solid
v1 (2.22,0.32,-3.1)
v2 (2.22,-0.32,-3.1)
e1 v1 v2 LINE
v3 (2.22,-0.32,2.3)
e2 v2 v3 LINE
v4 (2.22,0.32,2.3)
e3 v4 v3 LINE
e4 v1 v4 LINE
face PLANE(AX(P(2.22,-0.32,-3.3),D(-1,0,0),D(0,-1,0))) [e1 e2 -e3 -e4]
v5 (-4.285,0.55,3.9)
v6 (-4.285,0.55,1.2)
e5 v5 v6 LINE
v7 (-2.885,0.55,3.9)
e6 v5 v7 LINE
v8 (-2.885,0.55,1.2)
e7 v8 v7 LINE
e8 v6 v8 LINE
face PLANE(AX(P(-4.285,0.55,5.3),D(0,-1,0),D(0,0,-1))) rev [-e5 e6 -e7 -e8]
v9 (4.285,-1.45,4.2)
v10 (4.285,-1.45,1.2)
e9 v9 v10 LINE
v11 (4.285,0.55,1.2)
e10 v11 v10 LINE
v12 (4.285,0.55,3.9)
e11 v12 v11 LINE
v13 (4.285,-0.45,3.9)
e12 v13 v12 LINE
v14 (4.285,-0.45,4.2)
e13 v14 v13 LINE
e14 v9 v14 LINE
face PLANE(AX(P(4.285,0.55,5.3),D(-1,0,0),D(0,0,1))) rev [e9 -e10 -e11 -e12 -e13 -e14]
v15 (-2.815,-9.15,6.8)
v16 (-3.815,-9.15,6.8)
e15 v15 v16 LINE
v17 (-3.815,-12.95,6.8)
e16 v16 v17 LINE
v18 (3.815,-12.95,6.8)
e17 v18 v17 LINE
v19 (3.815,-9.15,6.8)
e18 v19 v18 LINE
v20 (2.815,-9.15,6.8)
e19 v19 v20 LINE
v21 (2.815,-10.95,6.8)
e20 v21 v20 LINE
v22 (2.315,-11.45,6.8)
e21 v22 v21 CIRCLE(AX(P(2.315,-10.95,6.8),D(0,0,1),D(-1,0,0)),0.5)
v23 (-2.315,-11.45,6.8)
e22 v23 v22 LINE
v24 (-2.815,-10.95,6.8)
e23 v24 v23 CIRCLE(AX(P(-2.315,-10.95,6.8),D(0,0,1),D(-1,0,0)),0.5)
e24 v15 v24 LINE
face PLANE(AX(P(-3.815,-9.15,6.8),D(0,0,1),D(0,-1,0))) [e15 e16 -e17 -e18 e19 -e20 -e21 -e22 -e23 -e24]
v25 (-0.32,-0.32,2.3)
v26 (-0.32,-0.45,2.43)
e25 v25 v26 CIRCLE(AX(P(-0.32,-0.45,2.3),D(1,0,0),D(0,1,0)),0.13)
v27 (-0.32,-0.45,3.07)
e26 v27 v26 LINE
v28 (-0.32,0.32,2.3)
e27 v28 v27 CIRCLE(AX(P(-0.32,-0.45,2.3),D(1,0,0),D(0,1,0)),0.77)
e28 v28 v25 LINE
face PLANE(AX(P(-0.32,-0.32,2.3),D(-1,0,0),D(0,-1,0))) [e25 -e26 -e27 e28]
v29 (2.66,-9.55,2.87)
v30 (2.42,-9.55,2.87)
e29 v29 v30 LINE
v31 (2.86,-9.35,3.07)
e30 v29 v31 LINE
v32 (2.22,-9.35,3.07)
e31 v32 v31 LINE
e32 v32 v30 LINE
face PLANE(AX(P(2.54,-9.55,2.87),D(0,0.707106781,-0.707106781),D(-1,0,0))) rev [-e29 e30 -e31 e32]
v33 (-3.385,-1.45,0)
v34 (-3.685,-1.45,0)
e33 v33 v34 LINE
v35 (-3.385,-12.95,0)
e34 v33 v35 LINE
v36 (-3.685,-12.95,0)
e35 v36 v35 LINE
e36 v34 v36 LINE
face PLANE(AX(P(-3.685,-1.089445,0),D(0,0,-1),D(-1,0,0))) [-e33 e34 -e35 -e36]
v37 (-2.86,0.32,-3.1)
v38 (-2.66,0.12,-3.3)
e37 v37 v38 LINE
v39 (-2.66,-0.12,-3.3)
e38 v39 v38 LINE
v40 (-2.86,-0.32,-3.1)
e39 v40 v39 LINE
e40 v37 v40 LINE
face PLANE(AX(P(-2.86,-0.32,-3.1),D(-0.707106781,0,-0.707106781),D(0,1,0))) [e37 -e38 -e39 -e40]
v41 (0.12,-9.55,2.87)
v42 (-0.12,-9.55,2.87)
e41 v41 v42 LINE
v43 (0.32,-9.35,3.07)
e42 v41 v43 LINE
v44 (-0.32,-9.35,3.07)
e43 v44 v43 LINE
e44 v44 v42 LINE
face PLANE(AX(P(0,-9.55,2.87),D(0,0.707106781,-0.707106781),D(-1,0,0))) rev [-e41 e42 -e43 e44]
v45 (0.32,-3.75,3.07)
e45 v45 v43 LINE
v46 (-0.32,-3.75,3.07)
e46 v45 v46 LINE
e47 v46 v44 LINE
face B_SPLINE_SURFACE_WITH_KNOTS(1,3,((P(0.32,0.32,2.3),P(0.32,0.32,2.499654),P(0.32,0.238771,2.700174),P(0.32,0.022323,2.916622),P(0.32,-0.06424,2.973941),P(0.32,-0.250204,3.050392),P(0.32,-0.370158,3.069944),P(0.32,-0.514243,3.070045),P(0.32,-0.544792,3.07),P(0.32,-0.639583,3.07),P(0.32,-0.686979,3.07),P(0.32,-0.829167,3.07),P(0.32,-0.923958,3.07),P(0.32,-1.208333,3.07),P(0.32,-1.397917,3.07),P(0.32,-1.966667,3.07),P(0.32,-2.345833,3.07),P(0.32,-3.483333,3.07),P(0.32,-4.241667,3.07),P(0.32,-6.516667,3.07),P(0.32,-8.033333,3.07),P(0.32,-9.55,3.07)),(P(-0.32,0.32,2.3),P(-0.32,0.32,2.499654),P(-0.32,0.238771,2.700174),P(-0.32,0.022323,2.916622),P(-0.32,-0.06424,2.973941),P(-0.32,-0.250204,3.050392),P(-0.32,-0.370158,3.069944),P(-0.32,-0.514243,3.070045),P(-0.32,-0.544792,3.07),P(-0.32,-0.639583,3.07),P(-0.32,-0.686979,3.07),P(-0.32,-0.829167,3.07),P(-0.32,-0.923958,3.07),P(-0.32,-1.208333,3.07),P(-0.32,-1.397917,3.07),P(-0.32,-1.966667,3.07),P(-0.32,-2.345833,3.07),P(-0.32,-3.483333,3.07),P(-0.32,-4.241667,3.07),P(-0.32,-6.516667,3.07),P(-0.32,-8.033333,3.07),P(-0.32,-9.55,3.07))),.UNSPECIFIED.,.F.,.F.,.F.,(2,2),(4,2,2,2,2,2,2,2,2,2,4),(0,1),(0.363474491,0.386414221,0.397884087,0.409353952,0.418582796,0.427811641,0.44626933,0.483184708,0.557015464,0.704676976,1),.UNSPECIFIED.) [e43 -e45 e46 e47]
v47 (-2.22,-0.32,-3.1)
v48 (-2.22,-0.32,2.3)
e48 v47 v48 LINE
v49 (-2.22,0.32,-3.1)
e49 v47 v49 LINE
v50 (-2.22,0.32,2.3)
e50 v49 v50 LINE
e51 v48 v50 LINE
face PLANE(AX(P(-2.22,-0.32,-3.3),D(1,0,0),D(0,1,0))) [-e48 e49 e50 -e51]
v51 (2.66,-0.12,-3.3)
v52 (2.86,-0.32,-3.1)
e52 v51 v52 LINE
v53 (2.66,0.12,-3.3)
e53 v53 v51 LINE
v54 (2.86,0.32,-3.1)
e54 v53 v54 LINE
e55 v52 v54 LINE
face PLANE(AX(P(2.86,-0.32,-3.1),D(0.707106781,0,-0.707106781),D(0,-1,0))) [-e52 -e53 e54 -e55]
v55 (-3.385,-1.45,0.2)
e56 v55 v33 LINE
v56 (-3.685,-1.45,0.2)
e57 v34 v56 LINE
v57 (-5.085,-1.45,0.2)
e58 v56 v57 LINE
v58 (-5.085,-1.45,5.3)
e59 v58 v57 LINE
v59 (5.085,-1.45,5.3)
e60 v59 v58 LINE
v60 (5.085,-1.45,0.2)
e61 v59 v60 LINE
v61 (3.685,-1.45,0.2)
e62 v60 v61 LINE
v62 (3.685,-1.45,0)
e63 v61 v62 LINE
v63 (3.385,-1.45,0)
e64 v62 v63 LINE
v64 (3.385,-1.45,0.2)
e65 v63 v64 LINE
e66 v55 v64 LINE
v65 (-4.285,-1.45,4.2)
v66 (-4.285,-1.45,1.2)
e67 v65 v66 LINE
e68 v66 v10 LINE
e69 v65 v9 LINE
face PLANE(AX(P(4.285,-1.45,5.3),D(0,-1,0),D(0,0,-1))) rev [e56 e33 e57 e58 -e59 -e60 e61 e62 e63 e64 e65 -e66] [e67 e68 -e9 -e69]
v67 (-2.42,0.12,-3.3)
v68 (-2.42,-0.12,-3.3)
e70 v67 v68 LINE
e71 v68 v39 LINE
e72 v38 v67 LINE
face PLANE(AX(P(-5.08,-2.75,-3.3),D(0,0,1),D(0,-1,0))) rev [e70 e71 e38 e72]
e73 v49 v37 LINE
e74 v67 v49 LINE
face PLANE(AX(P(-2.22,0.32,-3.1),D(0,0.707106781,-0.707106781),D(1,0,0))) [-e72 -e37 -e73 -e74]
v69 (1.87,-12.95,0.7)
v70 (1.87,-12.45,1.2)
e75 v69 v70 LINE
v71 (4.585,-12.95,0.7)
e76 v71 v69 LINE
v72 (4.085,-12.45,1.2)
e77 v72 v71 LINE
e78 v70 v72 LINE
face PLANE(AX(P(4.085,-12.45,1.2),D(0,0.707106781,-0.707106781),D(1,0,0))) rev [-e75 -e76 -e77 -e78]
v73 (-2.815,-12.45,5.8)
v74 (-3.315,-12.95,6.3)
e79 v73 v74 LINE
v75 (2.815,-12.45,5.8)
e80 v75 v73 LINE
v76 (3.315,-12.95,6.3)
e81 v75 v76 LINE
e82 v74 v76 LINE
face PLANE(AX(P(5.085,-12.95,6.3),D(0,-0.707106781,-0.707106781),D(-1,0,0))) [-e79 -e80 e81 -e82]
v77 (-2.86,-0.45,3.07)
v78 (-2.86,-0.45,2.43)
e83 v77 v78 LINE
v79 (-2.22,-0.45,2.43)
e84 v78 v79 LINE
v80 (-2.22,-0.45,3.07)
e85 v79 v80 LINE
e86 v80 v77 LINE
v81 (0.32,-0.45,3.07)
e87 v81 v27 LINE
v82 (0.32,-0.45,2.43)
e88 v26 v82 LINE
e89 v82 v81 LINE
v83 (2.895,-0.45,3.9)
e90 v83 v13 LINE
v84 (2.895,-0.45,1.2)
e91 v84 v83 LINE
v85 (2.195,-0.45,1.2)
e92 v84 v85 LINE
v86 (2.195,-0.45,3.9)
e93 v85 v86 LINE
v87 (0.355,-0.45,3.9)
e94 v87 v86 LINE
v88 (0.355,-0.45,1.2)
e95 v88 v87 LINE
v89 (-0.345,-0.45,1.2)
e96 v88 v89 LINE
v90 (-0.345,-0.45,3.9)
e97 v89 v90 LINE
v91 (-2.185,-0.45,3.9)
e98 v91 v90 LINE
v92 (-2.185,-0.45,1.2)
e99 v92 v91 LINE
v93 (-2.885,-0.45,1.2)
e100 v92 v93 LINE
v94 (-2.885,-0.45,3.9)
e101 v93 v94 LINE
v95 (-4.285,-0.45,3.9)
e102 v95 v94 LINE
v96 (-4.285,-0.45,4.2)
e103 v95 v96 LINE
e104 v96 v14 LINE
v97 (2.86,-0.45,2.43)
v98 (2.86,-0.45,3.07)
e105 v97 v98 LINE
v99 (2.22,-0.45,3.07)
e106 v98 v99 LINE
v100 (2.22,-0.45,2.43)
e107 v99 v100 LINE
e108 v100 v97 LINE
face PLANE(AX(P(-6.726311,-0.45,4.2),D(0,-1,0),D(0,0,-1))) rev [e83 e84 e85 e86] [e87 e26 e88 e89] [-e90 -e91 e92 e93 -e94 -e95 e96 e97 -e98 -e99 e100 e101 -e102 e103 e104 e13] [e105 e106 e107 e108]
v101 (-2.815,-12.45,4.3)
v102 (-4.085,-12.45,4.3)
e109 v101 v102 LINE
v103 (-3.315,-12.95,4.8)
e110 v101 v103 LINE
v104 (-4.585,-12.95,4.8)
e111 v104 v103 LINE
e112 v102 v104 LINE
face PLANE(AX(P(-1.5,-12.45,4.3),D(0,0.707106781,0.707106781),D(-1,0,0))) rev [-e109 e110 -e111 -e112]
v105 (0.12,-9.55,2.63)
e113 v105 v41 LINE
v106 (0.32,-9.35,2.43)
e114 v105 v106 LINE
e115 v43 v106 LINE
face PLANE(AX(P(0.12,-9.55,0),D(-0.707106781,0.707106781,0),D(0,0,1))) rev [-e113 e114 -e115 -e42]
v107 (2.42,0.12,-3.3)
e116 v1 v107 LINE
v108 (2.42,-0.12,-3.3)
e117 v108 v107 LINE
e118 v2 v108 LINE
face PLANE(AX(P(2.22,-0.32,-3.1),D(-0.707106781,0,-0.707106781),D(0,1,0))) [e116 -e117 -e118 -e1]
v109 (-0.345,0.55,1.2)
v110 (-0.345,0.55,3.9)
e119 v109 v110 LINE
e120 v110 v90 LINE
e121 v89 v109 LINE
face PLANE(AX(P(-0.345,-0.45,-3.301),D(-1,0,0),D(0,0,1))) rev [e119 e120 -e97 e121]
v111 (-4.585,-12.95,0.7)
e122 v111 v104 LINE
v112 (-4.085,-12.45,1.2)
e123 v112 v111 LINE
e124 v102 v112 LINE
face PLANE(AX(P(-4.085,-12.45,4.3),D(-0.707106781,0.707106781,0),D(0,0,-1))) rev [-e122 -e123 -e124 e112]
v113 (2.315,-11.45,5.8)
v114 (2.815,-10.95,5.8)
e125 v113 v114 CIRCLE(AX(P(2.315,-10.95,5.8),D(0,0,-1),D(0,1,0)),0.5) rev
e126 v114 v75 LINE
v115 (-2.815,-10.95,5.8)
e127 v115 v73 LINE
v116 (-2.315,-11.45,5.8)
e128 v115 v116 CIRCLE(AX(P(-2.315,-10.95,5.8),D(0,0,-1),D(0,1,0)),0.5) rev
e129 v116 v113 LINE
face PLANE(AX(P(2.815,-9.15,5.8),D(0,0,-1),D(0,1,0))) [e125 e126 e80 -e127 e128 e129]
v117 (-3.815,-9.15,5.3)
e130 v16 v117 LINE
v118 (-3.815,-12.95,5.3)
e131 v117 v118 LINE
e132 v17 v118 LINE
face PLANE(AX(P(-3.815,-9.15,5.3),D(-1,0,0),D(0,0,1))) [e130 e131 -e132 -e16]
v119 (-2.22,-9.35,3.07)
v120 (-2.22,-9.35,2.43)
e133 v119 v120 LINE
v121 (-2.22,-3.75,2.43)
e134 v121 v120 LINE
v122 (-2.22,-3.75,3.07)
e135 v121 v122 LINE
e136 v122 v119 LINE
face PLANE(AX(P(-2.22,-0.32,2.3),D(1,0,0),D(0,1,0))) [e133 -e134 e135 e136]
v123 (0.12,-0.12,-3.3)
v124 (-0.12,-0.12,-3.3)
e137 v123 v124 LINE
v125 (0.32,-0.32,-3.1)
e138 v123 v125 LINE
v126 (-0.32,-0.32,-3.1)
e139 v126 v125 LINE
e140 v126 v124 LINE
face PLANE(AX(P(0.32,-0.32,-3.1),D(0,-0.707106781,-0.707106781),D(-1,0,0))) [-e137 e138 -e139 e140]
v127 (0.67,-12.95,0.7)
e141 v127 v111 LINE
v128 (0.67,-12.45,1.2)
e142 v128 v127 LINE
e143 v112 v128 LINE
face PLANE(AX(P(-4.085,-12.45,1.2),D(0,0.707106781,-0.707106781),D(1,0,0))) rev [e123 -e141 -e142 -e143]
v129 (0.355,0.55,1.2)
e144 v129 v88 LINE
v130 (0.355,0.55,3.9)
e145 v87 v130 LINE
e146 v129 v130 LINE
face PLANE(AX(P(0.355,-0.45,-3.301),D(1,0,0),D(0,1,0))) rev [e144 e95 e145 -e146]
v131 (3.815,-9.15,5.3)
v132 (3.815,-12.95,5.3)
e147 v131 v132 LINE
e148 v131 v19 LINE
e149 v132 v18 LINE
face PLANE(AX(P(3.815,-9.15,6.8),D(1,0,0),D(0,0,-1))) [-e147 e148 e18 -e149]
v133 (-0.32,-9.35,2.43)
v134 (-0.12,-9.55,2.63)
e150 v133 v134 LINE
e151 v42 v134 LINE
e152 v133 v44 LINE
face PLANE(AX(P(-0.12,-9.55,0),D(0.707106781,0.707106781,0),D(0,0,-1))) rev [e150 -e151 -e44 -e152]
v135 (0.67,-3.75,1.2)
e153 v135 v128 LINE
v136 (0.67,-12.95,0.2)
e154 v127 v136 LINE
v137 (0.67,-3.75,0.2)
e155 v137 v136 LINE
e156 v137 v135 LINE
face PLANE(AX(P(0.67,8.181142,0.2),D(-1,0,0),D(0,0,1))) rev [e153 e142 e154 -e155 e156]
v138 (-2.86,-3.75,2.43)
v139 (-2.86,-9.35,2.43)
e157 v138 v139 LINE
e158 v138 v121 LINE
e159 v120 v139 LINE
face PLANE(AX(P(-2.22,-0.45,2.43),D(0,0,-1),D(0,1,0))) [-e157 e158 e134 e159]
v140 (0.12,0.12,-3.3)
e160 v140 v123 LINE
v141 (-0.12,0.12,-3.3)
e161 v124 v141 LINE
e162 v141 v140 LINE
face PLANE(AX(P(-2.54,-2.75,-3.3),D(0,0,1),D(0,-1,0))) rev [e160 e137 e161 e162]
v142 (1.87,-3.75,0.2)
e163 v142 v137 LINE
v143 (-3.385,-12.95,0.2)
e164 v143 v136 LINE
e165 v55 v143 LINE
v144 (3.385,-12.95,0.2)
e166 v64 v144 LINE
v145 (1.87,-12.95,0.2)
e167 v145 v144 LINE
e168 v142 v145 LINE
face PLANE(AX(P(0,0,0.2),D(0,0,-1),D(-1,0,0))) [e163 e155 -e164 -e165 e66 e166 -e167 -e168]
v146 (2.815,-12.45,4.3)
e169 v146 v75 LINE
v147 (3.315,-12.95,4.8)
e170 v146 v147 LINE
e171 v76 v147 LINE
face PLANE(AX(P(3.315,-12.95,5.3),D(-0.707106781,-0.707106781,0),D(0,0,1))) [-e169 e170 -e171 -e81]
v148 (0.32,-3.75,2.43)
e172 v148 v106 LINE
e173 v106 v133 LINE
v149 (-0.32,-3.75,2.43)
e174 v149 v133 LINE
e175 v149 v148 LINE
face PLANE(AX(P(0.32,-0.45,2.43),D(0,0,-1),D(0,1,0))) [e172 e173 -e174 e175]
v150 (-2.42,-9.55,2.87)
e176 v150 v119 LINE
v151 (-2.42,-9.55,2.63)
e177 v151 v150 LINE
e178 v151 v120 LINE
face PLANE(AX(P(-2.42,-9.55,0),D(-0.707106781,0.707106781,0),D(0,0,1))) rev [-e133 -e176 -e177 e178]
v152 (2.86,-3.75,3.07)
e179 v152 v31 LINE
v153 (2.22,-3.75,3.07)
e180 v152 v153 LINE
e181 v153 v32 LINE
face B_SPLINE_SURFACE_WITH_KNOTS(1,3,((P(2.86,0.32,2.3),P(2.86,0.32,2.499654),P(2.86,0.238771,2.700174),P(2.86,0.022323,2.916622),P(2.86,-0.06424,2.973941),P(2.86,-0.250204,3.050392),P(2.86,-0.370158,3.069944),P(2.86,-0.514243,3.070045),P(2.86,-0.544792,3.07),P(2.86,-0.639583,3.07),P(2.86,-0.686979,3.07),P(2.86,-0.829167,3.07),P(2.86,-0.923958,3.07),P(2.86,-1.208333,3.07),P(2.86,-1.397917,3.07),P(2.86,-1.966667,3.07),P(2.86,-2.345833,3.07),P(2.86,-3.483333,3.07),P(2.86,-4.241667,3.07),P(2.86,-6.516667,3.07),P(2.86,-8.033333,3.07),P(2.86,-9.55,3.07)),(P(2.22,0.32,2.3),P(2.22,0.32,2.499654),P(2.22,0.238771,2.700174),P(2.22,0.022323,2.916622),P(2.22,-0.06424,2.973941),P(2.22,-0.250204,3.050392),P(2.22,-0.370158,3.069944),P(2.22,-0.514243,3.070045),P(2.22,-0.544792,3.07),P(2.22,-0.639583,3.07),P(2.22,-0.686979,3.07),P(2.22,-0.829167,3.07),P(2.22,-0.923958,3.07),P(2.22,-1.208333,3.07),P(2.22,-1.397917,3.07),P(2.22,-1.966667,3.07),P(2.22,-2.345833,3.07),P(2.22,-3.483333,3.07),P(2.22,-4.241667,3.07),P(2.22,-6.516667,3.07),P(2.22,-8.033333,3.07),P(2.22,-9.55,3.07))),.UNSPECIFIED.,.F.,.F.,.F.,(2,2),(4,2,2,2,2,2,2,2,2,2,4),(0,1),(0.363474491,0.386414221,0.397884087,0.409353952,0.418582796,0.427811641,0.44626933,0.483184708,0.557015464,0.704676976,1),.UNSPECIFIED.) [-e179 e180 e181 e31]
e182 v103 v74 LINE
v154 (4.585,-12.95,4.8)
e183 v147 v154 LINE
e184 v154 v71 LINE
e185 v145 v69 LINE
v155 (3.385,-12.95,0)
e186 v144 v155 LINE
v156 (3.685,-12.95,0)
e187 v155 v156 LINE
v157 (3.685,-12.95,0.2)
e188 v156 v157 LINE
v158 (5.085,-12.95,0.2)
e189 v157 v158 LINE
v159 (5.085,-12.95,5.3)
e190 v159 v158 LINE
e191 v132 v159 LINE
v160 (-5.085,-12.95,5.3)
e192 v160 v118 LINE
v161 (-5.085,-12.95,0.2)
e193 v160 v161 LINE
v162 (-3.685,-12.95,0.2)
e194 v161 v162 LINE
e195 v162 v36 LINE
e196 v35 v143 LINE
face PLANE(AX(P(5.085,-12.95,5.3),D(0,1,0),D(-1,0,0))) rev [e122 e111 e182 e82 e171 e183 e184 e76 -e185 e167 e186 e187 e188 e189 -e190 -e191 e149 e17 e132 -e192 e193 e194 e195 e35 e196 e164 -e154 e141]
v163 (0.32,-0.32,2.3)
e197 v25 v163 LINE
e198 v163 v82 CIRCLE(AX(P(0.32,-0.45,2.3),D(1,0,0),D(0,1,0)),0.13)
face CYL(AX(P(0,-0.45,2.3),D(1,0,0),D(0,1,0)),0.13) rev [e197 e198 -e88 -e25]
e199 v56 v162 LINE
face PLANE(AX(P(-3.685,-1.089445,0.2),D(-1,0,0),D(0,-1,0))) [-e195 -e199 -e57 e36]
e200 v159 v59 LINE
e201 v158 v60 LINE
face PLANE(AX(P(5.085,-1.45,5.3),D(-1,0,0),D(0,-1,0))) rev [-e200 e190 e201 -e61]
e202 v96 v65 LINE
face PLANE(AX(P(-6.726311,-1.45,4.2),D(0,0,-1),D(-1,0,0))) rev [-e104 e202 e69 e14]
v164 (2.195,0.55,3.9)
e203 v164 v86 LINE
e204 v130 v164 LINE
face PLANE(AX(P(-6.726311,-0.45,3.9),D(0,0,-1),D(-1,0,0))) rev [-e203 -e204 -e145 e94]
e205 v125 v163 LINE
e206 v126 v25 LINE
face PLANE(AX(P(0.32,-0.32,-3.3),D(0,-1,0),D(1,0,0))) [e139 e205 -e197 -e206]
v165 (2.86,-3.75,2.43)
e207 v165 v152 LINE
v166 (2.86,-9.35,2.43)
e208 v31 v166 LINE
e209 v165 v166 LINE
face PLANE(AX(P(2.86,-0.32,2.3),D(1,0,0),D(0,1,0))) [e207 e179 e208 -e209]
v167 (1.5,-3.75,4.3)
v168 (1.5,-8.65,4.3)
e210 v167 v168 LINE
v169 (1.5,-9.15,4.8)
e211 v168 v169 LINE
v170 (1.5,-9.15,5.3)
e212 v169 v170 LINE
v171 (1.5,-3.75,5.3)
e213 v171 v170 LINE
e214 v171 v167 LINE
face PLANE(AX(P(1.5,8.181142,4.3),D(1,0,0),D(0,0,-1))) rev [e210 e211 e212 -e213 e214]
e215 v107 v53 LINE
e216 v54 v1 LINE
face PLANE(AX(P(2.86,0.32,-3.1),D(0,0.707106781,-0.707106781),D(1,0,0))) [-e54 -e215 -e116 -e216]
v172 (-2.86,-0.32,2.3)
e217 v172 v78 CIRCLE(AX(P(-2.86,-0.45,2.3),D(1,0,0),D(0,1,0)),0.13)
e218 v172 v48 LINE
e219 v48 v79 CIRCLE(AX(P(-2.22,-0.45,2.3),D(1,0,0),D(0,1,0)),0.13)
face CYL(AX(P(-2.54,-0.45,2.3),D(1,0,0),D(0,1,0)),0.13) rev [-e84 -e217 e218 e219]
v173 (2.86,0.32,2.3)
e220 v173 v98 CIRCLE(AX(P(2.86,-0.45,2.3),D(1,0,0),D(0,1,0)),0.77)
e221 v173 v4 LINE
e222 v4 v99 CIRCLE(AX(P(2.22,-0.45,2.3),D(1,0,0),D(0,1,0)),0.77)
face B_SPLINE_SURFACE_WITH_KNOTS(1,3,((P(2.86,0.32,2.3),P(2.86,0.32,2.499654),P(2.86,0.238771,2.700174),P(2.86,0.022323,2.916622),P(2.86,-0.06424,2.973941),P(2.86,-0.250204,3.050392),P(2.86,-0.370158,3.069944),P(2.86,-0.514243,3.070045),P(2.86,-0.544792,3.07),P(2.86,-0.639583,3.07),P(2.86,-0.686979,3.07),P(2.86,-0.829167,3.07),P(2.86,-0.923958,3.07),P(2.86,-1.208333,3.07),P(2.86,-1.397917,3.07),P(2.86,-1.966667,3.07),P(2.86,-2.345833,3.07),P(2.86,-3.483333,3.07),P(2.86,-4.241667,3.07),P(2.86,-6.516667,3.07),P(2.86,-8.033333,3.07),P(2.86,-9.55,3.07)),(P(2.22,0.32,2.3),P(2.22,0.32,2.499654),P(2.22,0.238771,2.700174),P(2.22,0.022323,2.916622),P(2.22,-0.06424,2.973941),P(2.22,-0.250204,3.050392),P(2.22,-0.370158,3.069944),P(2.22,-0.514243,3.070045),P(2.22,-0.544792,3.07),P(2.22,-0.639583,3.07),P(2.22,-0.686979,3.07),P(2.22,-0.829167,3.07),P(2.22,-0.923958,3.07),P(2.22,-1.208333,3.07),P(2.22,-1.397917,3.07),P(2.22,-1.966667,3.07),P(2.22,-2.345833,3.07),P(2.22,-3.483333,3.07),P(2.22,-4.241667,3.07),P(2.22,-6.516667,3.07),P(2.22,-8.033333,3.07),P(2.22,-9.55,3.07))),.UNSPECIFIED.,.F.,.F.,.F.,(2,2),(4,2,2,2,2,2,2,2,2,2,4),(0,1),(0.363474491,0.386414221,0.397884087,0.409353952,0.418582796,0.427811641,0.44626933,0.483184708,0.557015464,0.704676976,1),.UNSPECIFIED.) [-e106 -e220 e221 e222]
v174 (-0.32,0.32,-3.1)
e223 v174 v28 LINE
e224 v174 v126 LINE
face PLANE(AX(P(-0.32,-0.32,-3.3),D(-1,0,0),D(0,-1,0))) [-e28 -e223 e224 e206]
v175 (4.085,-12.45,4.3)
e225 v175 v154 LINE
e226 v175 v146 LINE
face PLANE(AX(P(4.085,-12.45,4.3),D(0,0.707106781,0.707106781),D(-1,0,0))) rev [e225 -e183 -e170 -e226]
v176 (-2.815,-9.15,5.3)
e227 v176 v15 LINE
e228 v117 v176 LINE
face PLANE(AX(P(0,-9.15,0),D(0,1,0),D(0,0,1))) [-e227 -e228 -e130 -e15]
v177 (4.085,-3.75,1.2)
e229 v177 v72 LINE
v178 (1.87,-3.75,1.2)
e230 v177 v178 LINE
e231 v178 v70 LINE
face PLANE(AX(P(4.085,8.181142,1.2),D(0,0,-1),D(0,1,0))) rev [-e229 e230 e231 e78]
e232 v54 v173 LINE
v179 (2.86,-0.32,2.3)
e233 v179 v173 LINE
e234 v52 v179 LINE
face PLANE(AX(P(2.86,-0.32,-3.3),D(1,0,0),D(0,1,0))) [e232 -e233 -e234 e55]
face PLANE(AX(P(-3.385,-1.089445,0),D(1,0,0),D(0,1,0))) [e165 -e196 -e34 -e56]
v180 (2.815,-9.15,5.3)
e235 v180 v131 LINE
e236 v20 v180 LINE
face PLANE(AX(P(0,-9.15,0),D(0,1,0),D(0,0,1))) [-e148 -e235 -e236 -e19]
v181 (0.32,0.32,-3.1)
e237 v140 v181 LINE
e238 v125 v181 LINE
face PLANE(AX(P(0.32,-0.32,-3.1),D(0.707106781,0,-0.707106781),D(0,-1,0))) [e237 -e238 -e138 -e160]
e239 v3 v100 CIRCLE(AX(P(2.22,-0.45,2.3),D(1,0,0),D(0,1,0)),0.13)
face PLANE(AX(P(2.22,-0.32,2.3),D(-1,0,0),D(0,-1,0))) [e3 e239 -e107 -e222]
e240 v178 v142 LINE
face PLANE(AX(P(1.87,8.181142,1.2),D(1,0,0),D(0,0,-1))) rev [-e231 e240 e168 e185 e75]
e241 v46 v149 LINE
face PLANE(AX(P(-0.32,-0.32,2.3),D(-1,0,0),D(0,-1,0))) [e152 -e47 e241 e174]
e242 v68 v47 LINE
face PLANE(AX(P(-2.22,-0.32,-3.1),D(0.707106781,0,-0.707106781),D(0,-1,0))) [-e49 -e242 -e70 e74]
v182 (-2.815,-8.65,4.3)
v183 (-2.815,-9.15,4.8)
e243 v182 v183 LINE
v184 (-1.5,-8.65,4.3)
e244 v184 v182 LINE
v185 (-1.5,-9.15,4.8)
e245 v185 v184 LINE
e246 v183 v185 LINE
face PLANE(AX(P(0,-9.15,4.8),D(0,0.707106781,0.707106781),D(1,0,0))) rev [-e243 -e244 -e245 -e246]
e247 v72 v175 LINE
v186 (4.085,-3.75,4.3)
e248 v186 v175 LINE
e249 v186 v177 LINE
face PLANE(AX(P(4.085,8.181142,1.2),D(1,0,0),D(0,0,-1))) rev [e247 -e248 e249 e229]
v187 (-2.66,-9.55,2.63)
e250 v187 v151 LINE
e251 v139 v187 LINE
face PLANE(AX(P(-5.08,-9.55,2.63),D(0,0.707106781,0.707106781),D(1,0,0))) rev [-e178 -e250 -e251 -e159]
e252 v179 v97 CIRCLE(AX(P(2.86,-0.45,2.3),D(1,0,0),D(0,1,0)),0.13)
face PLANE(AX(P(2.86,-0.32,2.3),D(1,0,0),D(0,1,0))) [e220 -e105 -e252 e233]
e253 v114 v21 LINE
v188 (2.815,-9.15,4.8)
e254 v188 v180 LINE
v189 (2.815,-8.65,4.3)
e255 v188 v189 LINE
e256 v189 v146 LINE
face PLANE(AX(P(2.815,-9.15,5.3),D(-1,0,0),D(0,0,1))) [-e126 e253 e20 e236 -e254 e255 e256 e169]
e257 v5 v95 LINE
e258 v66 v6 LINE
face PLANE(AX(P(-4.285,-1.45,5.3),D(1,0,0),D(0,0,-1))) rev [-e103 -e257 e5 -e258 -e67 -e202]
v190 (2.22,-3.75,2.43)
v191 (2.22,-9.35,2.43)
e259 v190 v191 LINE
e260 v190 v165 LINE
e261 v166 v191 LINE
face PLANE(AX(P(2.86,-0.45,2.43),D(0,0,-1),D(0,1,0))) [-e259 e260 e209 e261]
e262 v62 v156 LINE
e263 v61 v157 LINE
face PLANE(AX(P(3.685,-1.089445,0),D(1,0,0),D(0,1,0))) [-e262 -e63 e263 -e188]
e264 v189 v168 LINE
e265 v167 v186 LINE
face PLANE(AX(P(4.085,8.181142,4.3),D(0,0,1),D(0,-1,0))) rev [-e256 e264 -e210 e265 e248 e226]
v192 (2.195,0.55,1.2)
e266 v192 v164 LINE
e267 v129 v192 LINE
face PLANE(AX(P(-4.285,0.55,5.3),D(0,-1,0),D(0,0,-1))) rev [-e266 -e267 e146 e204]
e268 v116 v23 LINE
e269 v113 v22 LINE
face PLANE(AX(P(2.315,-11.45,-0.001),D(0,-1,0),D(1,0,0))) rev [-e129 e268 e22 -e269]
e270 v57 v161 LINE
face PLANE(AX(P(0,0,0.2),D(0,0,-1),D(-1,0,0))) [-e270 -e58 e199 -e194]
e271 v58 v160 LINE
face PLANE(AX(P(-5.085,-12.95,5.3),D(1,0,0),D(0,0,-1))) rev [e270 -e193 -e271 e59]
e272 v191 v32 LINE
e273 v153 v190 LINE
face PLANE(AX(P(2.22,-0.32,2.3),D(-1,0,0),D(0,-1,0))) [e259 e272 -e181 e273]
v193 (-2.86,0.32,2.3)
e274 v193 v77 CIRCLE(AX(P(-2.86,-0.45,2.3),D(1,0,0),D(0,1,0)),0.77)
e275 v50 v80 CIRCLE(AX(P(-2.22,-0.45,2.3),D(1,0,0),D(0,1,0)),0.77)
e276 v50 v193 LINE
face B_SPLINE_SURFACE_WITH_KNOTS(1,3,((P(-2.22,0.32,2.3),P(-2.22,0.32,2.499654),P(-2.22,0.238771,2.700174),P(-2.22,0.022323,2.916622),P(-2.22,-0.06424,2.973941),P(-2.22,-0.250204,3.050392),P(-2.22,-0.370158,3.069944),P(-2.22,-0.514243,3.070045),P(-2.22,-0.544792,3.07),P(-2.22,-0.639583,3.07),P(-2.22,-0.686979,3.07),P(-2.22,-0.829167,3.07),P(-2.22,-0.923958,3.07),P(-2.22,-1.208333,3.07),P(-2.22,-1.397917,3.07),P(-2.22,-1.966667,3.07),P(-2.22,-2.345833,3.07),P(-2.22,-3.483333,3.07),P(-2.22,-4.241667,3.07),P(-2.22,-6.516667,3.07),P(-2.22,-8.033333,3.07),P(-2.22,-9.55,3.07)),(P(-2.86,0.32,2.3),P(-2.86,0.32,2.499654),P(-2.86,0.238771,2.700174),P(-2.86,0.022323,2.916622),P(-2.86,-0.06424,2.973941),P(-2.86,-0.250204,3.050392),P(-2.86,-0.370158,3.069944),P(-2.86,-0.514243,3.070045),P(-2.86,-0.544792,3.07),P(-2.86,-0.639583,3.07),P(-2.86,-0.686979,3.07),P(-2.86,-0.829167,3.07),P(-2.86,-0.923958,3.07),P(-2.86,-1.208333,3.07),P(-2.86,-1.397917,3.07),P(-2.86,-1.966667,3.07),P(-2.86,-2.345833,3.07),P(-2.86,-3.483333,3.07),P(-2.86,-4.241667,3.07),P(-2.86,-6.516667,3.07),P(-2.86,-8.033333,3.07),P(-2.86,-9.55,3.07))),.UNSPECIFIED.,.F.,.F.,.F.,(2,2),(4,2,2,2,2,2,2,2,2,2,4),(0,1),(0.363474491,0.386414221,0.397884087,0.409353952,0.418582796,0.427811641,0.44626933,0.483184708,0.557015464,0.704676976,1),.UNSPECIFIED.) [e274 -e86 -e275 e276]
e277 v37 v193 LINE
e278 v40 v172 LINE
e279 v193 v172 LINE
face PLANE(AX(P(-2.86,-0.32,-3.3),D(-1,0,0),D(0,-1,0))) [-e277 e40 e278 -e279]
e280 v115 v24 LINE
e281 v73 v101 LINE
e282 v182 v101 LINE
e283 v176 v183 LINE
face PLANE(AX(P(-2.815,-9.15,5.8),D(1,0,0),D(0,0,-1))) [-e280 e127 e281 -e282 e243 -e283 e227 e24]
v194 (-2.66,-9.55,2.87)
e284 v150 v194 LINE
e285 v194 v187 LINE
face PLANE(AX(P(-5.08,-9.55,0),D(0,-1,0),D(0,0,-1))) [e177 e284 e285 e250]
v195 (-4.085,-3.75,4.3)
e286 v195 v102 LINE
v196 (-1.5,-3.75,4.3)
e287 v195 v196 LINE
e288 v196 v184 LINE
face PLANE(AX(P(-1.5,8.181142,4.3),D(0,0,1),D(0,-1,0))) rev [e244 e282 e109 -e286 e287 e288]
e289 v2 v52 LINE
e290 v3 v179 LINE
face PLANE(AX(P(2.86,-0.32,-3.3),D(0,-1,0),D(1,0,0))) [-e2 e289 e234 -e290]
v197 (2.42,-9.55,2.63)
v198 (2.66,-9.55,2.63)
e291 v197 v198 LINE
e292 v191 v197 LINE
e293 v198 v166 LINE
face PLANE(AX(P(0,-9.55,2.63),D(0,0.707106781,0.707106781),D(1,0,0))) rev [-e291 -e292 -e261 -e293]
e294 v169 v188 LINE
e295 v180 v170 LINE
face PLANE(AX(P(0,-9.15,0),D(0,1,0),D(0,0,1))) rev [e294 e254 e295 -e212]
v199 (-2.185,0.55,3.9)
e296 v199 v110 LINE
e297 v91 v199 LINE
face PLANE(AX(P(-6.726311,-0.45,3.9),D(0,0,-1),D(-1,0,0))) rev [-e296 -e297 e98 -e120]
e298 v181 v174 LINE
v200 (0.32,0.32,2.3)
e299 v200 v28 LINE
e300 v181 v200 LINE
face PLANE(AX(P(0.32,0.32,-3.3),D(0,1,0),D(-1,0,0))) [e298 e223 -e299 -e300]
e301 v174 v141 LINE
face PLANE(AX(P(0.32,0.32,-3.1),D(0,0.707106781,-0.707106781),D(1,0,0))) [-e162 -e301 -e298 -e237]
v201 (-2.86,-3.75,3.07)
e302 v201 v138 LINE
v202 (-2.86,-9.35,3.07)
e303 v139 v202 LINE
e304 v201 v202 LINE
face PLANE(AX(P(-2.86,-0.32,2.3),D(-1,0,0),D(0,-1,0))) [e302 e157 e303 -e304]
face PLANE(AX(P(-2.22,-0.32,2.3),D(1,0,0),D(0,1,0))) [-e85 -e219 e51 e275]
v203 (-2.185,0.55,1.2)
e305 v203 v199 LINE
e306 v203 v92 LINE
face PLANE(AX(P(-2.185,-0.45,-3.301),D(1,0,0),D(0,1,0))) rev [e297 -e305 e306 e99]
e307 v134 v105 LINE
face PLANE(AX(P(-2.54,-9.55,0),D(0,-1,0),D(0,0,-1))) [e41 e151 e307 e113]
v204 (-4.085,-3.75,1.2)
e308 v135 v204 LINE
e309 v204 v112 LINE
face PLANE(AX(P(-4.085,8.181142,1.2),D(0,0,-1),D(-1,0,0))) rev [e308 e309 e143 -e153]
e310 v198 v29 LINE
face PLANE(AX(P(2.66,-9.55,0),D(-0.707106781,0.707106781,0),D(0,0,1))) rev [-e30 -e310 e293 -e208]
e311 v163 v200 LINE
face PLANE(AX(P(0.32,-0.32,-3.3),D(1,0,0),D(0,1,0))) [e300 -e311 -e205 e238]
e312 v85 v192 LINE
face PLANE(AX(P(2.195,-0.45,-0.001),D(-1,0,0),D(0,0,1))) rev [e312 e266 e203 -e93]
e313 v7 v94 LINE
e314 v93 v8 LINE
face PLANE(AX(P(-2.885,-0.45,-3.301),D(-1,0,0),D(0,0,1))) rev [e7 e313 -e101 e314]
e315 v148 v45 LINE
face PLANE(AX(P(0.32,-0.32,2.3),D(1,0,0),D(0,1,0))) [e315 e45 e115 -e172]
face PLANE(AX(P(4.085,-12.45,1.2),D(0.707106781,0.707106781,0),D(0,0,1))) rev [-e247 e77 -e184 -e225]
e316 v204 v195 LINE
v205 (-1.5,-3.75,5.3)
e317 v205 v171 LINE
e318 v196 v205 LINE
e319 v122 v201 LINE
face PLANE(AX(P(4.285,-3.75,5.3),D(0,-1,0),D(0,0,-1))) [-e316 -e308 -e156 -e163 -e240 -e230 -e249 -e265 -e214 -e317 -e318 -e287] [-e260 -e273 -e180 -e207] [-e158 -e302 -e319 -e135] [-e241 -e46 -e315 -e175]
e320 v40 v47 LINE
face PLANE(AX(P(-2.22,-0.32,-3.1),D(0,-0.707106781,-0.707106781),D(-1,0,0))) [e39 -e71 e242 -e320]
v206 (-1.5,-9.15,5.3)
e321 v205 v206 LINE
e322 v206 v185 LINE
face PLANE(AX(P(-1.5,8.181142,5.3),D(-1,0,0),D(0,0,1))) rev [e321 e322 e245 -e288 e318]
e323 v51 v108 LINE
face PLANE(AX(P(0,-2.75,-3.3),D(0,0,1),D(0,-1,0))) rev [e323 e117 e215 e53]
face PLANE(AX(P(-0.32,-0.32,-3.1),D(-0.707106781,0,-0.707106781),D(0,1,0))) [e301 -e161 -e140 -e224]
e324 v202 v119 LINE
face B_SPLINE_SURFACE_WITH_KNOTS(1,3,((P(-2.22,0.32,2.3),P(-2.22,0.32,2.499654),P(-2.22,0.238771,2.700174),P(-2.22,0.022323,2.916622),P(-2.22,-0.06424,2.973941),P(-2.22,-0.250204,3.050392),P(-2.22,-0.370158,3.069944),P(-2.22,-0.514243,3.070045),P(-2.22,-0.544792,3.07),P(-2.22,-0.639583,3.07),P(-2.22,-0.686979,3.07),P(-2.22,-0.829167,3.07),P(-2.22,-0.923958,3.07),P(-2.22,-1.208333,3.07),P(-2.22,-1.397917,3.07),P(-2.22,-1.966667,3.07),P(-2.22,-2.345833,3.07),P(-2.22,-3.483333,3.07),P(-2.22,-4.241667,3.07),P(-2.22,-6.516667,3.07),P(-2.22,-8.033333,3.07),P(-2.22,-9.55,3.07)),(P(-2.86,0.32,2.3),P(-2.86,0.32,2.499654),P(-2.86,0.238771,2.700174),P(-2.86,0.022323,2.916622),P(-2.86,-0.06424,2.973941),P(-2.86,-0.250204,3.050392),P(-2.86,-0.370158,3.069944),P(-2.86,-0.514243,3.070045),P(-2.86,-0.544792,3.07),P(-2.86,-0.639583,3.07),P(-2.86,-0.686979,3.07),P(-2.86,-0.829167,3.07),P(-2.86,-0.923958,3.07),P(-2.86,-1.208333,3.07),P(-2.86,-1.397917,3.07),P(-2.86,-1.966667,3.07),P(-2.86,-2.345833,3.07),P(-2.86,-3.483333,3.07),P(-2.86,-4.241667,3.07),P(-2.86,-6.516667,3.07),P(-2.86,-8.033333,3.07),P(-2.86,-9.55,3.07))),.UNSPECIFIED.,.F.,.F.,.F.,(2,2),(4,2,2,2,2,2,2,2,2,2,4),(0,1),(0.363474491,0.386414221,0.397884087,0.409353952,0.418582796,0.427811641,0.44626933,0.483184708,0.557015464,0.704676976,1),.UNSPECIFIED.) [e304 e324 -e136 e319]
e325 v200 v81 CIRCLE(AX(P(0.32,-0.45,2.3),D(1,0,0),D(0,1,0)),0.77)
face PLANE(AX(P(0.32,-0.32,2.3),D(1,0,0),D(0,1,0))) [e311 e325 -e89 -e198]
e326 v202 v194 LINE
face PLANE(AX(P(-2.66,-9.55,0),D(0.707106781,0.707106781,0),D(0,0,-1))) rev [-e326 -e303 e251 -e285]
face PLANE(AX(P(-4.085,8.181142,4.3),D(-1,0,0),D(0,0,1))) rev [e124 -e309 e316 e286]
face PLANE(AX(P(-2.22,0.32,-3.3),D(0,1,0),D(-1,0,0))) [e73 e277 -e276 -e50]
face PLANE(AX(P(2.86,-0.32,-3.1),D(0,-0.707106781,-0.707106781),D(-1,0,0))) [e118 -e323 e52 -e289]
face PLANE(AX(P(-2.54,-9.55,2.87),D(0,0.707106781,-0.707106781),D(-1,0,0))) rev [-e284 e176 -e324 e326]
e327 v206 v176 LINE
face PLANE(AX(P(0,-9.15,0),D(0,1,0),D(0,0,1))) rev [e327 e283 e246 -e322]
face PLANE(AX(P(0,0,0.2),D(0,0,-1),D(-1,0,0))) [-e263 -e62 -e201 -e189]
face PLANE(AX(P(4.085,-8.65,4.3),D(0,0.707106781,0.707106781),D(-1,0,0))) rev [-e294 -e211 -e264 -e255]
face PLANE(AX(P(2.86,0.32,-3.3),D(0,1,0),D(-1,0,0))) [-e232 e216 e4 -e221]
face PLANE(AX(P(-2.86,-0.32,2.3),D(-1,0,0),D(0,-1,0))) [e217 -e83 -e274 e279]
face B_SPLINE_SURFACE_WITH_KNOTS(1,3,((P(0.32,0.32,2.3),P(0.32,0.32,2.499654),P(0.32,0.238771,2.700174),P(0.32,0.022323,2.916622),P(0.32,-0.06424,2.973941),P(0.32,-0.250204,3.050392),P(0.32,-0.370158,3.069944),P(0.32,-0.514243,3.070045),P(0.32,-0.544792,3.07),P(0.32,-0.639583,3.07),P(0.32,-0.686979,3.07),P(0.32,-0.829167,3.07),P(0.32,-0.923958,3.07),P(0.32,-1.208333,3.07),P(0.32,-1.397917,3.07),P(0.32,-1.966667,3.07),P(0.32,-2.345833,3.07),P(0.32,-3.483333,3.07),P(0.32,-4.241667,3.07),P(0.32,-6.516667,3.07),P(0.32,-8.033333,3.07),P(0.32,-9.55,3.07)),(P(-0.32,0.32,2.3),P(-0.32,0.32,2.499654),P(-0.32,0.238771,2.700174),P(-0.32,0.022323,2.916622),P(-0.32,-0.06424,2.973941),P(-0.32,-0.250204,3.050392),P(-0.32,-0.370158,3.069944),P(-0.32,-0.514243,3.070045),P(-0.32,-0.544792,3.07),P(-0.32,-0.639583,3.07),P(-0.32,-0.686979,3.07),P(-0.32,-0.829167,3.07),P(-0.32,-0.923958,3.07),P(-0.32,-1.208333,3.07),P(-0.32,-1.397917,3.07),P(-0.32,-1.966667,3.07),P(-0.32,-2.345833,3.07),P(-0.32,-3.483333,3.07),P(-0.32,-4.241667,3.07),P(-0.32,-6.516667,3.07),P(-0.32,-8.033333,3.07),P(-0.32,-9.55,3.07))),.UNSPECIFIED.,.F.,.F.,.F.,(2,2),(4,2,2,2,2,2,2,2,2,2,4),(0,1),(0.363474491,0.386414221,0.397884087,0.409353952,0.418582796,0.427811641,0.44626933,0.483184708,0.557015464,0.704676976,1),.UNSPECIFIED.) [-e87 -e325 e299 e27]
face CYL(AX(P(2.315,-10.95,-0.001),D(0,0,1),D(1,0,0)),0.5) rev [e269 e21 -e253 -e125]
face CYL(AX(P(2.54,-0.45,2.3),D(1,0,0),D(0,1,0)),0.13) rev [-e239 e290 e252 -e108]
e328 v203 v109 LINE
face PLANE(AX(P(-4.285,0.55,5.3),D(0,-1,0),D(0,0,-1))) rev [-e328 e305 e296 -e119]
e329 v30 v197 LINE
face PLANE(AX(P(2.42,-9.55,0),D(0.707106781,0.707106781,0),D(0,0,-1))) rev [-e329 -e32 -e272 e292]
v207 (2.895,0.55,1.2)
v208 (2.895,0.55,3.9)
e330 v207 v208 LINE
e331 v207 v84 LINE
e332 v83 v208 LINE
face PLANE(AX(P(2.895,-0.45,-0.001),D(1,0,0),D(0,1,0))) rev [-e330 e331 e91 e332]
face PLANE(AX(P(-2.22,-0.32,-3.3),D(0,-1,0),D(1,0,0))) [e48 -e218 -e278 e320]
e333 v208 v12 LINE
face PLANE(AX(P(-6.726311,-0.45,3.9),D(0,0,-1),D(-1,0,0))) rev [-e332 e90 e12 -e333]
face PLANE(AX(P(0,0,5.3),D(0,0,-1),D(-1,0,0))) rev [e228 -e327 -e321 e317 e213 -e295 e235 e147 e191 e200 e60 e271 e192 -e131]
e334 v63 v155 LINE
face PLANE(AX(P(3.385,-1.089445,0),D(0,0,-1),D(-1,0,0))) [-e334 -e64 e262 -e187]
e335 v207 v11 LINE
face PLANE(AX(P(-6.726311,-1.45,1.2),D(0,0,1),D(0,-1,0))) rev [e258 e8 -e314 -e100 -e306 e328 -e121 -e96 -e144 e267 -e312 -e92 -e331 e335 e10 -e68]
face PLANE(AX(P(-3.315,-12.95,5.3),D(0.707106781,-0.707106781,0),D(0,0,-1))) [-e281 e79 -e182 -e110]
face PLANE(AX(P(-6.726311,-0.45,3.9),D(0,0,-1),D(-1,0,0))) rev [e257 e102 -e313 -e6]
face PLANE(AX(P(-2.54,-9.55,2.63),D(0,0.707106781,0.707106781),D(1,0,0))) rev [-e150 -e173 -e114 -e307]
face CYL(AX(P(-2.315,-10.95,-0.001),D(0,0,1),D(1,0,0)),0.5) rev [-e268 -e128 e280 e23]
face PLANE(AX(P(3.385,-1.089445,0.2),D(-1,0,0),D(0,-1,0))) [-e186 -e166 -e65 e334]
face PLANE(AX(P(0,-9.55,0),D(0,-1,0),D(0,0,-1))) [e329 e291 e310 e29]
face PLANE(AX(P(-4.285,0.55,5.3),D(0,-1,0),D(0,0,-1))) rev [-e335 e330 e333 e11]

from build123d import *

# Parameters (mm, degrees)
EXTRUDE_START                      = 0.2
EXTRUDE_1_DEPTH                    = 5.1
SKETCH_7_W                         = 0.3
SKETCH_7_H                         = 0.2
EXTRUDE_4_DEPTH                    = 11.5
SKETCH_8_W                         = 1
SKETCH_8_H                         = 2
CUT_EXTRUDE_5_DEPTH                = 8.57
CUT_EXTRUDE_1_DEPTH                = 9.2
EXTRUDE_2_DEPTH                    = 3.8
SKETCH_4_W                         = 5.63
SKETCH_4_H                         = 1
CUT_EXTRUDE_2_DEPTH                = 3.8
CUT_EXTRUDE_3_REACH                = 17.485
CHAMFER_1_SIZE                     = 0.5
CUT_EXTRUDE_6_REACH                = 16.449
SKETCH_9_W                         = 0.7
SKETCH_9_H                         = 1
SWEEP_START                        = 2.22
SWEEP_1_DEPTH                      = 0.64
CHAMFER_2_SIZE                     = 0.2
PATTERN_LINEAR_2_COUNT             = 3
PATTERN_LINEAR_2_PITCH             = 2.54
PATTERN_LINEAR_1_COUNT             = 3
PATTERN_LINEAR_1_PITCH             = 2.54
CHAMFER_2_OF_PATTERN_LINEAR_1_SIZE = 0.2


# Read off the part's stored shape, not the designer's step: По траектории1
with BuildPart() as part:
    # Эскиз1 → Бобышка-Вытянуть1 (new body)
    with BuildSketch(Plane.XY.offset(EXTRUDE_START)):
        Polygon((-4.285, 0.55), (4.285, 0.55), (4.285, -1.45), (5.085, -1.45), (5.085, -12.95), (-5.085, -12.95), (-5.085, -1.45), (-4.285, -1.45), align=None)
    extrude(amount=EXTRUDE_1_DEPTH)

    # Эскиз7 → Бобышка-Вытянуть4 (add)
    with BuildSketch(Plane.XZ.offset(12.95)):
        with Locations((3.535, 0.1)):
            Rectangle(SKETCH_7_W, SKETCH_7_H)
        with Locations((-3.535, 0.1)):
            Rectangle(SKETCH_7_W, SKETCH_7_H)
    extrude(amount=-EXTRUDE_4_DEPTH)

    # Эскиз8 → Вырез-Вытянуть5 (cut)
    with BuildSketch(Plane(origin=(4.285, 0, 0), x_dir=(0, 0, -1), z_dir=(1, 0, 0))):
        with Locations((-0.7, -0.45)):
            Rectangle(SKETCH_8_W, SKETCH_8_H)
        Polygon((-4.2, -1.45), (-5.3, -1.45), (-5.3, 0.55), (-3.9, 0.55), (-3.9, -0.45), (-4.2, -0.45), align=None)
    extrude(amount=-CUT_EXTRUDE_5_DEPTH, mode=Mode.SUBTRACT)

    # Эскиз2 → Вырез-Вытянуть1 (cut)
    with BuildSketch(Plane.XZ.offset(12.95)):
        Polygon((-4.085, 4.3), (-4.085, 1.2), (0.67, 1.2), (0.67, 0.2), (1.87, 0.2), (1.87, 1.2), (4.085, 1.2), (4.085, 4.3), (1.5, 4.3), (1.5, 5.3), (-1.5, 5.3), (-1.5, 4.3), align=None)
    extrude(amount=-CUT_EXTRUDE_1_DEPTH, mode=Mode.SUBTRACT)

    # Эскиз3 → Бобышка-Вытянуть2 (add)
    with BuildSketch(Plane.XZ.offset(12.95)):
        Polygon((-3.815, 5.3), (-3.815, 6.8), (3.815, 6.8), (3.815, 5.3), (2.815, 5.3), (2.815, 5.8), (-2.815, 5.8), (-2.815, 5.3), align=None)
    extrude(amount=-EXTRUDE_2_DEPTH)

    # Эскиз4 → Вырез-Вытянуть2 (cut)
    with BuildSketch(Plane.XZ.offset(12.95)):
        with Locations((0, 4.8)):
            Rectangle(SKETCH_4_W, SKETCH_4_H)
    extrude(amount=-CUT_EXTRUDE_2_DEPTH, mode=Mode.SUBTRACT)

    # Эскиз5 → Вырез-Вытянуть3 (cut, up to next)
    with BuildSketch(Plane.XY.offset(6.8), mode=Mode.PRIVATE) as cut_extrude_3_sk1:
        with BuildLine():
            Line((2.815, -9.15), (2.815, -10.95))
            ThreePointArc((2.815, -10.95), (2.668553391, -11.303553391), (2.315, -11.45))
            Line((2.315, -11.45), (-2.315, -11.45))
            ThreePointArc((-2.315, -11.45), (-2.668553391, -11.303553391), (-2.815, -10.95))
            Line((-2.815, -10.95), (-2.815, -9.15))
            Line((-2.815, -9.15), (2.815, -9.15))
        make_face()
    cut_extrude_3_tool1 = extrude(cut_extrude_3_sk1.sketch, amount=-CUT_EXTRUDE_3_REACH, mode=Mode.PRIVATE) & part.part
    add(cut_extrude_3_tool1.solids().sort_by_distance((0, -10.291324, 6.8))[0], mode=Mode.SUBTRACT)

    # Фаска1
    chamfer_1_edges = [part.edges().sort_by_distance(p)[0] for p in [
        (-2.815, -12.95, 5.05),
        (0, -12.95, 5.8),
        (2.815, -12.95, 5.05),
        (2.1575, -9.15, 4.3),
        (-3.45, -12.95, 4.3),
        (-2.1575, -9.15, 4.3),
        (-4.085, -12.95, 2.75),
        (-1.7075, -12.95, 1.2),
        (2.9775, -12.95, 1.2),
        (4.085, -12.95, 2.75),
        (3.45, -12.95, 4.3),
    ]]
    chamfer(chamfer_1_edges, length=CHAMFER_1_SIZE)

    # Эскиз9 → Вырез-Вытянуть6 (cut, up to next)
    with BuildSketch(Plane.XY.offset(3.9), mode=Mode.PRIVATE) as cut_extrude_6_sk1:
        with Locations((2.545, 0.05)):
            Rectangle(SKETCH_9_W, SKETCH_9_H)
    cut_extrude_6_tool1 = extrude(cut_extrude_6_sk1.sketch, amount=-CUT_EXTRUDE_6_REACH, mode=Mode.PRIVATE) & part.part
    cut_extrude_6 = cut_extrude_6_tool1.solids().sort_by_distance((2.545, 0.05, 3.9))[0]
    add(cut_extrude_6, mode=Mode.SUBTRACT)

    # По траектории1 outline → По траектории1 (add)
    with BuildSketch(Plane.YZ.offset(SWEEP_START)):
        with BuildLine():
            Line((-3.75, 2.43), (-3.75, 3.07))
            add(Edge.make_bspline(
                [(-3.75, 3.07), (-4.166666667, 3.07), (-4.583333333, 3.07), (-6.516666667, 3.07), (-8.033333333, 3.07), (-9.55, 3.07)],
                knots=[0.623544277, 0.623544277, 0.623544277, 0.623544277, 0.704676976, 0.704676976, 1, 1, 1, 1], degree=3))
            Line((-9.55, 3.07), (-9.55, 2.43))
            Line((-9.55, 2.43), (-3.75, 2.43))
        make_face()
        with BuildLine():
            Line((0.32, -3.3), (0.32, 2.3))
            add(Edge.make_bspline(
                [(0.32, 2.3), (0.32, 2.499654349), (0.23877091, 2.700173533), (0.022322877, 2.916621566), (-0.064240468, 2.973940923), (-0.250203983, 3.050392149), (-0.370157621, 3.069944018), (-0.45, 3.07)],
                knots=[0.363474491, 0.363474491, 0.363474491, 0.363474491, 0.386414221, 0.386414221, 0.397884087, 0.397884087, 0.409353952, 0.409353952, 0.409353952, 0.409353952], degree=3))
            Line((-0.45, 3.07), (-0.45, 2.43))
            ThreePointArc((-0.45, 2.43), (-0.358076118, 2.391923882), (-0.32, 2.3))
            Line((-0.32, 2.3), (-0.32, -3.3))
            Line((-0.32, -3.3), (0.32, -3.3))
        make_face()
    sweep_1 = extrude(amount=SWEEP_1_DEPTH)

    # Фаска2
    chamfer_2_edges = [part.edges().sort_by_distance(p)[0] for p in [
        (2.54, -9.55, 3.07),
        (2.86, -9.55, 2.75),
        (2.54, -9.55, 2.43),
        (2.22, -9.55, 2.75),
        (2.54, -0.32, -3.3),
        (2.86, 0, -3.3),
        (2.54, 0.32, -3.3),
        (2.22, 0, -3.3),
    ]]
    chamfer(chamfer_2_edges, length=CHAMFER_2_SIZE)

    # Линейный массив2: Вырез-Вытянуть6 ×3
    with Locations(*[(-i * PATTERN_LINEAR_2_PITCH, 0, 0) for i in range(1, PATTERN_LINEAR_2_COUNT)]):
        add(cut_extrude_6, mode=Mode.SUBTRACT)

    # Линейный массив1: По траектории1 ×3
    with Locations(*[(-i * PATTERN_LINEAR_1_PITCH, 0, 0) for i in range(1, PATTERN_LINEAR_1_COUNT)]):
        add(sweep_1)

    # Фаска2 of Линейный массив1
    chamfer_2_of_pattern_linear_1_edges = [part.edges().sort_by_distance(p)[0] for p in [
        (0, -9.55, 3.07),
        (0.32, -9.55, 2.75),
        (0, -9.55, 2.43),
        (-0.32, -9.55, 2.75),
        (0, -0.32, -3.3),
        (0.32, 0, -3.3),
        (0, 0.32, -3.3),
        (-0.32, 0, -3.3),
        (-2.54, -9.55, 3.07),
        (-2.22, -9.55, 2.75),
        (-2.54, -9.55, 2.43),
        (-2.86, -9.55, 2.75),
        (-2.54, -0.32, -3.3),
        (-2.22, 0, -3.3),
        (-2.54, 0.32, -3.3),
        (-2.86, 0, -3.3),
    ]]
    chamfer(chamfer_2_of_pattern_linear_1_edges, length=CHAMFER_2_OF_PATTERN_LINEAR_1_SIZE)


solid = part.part
